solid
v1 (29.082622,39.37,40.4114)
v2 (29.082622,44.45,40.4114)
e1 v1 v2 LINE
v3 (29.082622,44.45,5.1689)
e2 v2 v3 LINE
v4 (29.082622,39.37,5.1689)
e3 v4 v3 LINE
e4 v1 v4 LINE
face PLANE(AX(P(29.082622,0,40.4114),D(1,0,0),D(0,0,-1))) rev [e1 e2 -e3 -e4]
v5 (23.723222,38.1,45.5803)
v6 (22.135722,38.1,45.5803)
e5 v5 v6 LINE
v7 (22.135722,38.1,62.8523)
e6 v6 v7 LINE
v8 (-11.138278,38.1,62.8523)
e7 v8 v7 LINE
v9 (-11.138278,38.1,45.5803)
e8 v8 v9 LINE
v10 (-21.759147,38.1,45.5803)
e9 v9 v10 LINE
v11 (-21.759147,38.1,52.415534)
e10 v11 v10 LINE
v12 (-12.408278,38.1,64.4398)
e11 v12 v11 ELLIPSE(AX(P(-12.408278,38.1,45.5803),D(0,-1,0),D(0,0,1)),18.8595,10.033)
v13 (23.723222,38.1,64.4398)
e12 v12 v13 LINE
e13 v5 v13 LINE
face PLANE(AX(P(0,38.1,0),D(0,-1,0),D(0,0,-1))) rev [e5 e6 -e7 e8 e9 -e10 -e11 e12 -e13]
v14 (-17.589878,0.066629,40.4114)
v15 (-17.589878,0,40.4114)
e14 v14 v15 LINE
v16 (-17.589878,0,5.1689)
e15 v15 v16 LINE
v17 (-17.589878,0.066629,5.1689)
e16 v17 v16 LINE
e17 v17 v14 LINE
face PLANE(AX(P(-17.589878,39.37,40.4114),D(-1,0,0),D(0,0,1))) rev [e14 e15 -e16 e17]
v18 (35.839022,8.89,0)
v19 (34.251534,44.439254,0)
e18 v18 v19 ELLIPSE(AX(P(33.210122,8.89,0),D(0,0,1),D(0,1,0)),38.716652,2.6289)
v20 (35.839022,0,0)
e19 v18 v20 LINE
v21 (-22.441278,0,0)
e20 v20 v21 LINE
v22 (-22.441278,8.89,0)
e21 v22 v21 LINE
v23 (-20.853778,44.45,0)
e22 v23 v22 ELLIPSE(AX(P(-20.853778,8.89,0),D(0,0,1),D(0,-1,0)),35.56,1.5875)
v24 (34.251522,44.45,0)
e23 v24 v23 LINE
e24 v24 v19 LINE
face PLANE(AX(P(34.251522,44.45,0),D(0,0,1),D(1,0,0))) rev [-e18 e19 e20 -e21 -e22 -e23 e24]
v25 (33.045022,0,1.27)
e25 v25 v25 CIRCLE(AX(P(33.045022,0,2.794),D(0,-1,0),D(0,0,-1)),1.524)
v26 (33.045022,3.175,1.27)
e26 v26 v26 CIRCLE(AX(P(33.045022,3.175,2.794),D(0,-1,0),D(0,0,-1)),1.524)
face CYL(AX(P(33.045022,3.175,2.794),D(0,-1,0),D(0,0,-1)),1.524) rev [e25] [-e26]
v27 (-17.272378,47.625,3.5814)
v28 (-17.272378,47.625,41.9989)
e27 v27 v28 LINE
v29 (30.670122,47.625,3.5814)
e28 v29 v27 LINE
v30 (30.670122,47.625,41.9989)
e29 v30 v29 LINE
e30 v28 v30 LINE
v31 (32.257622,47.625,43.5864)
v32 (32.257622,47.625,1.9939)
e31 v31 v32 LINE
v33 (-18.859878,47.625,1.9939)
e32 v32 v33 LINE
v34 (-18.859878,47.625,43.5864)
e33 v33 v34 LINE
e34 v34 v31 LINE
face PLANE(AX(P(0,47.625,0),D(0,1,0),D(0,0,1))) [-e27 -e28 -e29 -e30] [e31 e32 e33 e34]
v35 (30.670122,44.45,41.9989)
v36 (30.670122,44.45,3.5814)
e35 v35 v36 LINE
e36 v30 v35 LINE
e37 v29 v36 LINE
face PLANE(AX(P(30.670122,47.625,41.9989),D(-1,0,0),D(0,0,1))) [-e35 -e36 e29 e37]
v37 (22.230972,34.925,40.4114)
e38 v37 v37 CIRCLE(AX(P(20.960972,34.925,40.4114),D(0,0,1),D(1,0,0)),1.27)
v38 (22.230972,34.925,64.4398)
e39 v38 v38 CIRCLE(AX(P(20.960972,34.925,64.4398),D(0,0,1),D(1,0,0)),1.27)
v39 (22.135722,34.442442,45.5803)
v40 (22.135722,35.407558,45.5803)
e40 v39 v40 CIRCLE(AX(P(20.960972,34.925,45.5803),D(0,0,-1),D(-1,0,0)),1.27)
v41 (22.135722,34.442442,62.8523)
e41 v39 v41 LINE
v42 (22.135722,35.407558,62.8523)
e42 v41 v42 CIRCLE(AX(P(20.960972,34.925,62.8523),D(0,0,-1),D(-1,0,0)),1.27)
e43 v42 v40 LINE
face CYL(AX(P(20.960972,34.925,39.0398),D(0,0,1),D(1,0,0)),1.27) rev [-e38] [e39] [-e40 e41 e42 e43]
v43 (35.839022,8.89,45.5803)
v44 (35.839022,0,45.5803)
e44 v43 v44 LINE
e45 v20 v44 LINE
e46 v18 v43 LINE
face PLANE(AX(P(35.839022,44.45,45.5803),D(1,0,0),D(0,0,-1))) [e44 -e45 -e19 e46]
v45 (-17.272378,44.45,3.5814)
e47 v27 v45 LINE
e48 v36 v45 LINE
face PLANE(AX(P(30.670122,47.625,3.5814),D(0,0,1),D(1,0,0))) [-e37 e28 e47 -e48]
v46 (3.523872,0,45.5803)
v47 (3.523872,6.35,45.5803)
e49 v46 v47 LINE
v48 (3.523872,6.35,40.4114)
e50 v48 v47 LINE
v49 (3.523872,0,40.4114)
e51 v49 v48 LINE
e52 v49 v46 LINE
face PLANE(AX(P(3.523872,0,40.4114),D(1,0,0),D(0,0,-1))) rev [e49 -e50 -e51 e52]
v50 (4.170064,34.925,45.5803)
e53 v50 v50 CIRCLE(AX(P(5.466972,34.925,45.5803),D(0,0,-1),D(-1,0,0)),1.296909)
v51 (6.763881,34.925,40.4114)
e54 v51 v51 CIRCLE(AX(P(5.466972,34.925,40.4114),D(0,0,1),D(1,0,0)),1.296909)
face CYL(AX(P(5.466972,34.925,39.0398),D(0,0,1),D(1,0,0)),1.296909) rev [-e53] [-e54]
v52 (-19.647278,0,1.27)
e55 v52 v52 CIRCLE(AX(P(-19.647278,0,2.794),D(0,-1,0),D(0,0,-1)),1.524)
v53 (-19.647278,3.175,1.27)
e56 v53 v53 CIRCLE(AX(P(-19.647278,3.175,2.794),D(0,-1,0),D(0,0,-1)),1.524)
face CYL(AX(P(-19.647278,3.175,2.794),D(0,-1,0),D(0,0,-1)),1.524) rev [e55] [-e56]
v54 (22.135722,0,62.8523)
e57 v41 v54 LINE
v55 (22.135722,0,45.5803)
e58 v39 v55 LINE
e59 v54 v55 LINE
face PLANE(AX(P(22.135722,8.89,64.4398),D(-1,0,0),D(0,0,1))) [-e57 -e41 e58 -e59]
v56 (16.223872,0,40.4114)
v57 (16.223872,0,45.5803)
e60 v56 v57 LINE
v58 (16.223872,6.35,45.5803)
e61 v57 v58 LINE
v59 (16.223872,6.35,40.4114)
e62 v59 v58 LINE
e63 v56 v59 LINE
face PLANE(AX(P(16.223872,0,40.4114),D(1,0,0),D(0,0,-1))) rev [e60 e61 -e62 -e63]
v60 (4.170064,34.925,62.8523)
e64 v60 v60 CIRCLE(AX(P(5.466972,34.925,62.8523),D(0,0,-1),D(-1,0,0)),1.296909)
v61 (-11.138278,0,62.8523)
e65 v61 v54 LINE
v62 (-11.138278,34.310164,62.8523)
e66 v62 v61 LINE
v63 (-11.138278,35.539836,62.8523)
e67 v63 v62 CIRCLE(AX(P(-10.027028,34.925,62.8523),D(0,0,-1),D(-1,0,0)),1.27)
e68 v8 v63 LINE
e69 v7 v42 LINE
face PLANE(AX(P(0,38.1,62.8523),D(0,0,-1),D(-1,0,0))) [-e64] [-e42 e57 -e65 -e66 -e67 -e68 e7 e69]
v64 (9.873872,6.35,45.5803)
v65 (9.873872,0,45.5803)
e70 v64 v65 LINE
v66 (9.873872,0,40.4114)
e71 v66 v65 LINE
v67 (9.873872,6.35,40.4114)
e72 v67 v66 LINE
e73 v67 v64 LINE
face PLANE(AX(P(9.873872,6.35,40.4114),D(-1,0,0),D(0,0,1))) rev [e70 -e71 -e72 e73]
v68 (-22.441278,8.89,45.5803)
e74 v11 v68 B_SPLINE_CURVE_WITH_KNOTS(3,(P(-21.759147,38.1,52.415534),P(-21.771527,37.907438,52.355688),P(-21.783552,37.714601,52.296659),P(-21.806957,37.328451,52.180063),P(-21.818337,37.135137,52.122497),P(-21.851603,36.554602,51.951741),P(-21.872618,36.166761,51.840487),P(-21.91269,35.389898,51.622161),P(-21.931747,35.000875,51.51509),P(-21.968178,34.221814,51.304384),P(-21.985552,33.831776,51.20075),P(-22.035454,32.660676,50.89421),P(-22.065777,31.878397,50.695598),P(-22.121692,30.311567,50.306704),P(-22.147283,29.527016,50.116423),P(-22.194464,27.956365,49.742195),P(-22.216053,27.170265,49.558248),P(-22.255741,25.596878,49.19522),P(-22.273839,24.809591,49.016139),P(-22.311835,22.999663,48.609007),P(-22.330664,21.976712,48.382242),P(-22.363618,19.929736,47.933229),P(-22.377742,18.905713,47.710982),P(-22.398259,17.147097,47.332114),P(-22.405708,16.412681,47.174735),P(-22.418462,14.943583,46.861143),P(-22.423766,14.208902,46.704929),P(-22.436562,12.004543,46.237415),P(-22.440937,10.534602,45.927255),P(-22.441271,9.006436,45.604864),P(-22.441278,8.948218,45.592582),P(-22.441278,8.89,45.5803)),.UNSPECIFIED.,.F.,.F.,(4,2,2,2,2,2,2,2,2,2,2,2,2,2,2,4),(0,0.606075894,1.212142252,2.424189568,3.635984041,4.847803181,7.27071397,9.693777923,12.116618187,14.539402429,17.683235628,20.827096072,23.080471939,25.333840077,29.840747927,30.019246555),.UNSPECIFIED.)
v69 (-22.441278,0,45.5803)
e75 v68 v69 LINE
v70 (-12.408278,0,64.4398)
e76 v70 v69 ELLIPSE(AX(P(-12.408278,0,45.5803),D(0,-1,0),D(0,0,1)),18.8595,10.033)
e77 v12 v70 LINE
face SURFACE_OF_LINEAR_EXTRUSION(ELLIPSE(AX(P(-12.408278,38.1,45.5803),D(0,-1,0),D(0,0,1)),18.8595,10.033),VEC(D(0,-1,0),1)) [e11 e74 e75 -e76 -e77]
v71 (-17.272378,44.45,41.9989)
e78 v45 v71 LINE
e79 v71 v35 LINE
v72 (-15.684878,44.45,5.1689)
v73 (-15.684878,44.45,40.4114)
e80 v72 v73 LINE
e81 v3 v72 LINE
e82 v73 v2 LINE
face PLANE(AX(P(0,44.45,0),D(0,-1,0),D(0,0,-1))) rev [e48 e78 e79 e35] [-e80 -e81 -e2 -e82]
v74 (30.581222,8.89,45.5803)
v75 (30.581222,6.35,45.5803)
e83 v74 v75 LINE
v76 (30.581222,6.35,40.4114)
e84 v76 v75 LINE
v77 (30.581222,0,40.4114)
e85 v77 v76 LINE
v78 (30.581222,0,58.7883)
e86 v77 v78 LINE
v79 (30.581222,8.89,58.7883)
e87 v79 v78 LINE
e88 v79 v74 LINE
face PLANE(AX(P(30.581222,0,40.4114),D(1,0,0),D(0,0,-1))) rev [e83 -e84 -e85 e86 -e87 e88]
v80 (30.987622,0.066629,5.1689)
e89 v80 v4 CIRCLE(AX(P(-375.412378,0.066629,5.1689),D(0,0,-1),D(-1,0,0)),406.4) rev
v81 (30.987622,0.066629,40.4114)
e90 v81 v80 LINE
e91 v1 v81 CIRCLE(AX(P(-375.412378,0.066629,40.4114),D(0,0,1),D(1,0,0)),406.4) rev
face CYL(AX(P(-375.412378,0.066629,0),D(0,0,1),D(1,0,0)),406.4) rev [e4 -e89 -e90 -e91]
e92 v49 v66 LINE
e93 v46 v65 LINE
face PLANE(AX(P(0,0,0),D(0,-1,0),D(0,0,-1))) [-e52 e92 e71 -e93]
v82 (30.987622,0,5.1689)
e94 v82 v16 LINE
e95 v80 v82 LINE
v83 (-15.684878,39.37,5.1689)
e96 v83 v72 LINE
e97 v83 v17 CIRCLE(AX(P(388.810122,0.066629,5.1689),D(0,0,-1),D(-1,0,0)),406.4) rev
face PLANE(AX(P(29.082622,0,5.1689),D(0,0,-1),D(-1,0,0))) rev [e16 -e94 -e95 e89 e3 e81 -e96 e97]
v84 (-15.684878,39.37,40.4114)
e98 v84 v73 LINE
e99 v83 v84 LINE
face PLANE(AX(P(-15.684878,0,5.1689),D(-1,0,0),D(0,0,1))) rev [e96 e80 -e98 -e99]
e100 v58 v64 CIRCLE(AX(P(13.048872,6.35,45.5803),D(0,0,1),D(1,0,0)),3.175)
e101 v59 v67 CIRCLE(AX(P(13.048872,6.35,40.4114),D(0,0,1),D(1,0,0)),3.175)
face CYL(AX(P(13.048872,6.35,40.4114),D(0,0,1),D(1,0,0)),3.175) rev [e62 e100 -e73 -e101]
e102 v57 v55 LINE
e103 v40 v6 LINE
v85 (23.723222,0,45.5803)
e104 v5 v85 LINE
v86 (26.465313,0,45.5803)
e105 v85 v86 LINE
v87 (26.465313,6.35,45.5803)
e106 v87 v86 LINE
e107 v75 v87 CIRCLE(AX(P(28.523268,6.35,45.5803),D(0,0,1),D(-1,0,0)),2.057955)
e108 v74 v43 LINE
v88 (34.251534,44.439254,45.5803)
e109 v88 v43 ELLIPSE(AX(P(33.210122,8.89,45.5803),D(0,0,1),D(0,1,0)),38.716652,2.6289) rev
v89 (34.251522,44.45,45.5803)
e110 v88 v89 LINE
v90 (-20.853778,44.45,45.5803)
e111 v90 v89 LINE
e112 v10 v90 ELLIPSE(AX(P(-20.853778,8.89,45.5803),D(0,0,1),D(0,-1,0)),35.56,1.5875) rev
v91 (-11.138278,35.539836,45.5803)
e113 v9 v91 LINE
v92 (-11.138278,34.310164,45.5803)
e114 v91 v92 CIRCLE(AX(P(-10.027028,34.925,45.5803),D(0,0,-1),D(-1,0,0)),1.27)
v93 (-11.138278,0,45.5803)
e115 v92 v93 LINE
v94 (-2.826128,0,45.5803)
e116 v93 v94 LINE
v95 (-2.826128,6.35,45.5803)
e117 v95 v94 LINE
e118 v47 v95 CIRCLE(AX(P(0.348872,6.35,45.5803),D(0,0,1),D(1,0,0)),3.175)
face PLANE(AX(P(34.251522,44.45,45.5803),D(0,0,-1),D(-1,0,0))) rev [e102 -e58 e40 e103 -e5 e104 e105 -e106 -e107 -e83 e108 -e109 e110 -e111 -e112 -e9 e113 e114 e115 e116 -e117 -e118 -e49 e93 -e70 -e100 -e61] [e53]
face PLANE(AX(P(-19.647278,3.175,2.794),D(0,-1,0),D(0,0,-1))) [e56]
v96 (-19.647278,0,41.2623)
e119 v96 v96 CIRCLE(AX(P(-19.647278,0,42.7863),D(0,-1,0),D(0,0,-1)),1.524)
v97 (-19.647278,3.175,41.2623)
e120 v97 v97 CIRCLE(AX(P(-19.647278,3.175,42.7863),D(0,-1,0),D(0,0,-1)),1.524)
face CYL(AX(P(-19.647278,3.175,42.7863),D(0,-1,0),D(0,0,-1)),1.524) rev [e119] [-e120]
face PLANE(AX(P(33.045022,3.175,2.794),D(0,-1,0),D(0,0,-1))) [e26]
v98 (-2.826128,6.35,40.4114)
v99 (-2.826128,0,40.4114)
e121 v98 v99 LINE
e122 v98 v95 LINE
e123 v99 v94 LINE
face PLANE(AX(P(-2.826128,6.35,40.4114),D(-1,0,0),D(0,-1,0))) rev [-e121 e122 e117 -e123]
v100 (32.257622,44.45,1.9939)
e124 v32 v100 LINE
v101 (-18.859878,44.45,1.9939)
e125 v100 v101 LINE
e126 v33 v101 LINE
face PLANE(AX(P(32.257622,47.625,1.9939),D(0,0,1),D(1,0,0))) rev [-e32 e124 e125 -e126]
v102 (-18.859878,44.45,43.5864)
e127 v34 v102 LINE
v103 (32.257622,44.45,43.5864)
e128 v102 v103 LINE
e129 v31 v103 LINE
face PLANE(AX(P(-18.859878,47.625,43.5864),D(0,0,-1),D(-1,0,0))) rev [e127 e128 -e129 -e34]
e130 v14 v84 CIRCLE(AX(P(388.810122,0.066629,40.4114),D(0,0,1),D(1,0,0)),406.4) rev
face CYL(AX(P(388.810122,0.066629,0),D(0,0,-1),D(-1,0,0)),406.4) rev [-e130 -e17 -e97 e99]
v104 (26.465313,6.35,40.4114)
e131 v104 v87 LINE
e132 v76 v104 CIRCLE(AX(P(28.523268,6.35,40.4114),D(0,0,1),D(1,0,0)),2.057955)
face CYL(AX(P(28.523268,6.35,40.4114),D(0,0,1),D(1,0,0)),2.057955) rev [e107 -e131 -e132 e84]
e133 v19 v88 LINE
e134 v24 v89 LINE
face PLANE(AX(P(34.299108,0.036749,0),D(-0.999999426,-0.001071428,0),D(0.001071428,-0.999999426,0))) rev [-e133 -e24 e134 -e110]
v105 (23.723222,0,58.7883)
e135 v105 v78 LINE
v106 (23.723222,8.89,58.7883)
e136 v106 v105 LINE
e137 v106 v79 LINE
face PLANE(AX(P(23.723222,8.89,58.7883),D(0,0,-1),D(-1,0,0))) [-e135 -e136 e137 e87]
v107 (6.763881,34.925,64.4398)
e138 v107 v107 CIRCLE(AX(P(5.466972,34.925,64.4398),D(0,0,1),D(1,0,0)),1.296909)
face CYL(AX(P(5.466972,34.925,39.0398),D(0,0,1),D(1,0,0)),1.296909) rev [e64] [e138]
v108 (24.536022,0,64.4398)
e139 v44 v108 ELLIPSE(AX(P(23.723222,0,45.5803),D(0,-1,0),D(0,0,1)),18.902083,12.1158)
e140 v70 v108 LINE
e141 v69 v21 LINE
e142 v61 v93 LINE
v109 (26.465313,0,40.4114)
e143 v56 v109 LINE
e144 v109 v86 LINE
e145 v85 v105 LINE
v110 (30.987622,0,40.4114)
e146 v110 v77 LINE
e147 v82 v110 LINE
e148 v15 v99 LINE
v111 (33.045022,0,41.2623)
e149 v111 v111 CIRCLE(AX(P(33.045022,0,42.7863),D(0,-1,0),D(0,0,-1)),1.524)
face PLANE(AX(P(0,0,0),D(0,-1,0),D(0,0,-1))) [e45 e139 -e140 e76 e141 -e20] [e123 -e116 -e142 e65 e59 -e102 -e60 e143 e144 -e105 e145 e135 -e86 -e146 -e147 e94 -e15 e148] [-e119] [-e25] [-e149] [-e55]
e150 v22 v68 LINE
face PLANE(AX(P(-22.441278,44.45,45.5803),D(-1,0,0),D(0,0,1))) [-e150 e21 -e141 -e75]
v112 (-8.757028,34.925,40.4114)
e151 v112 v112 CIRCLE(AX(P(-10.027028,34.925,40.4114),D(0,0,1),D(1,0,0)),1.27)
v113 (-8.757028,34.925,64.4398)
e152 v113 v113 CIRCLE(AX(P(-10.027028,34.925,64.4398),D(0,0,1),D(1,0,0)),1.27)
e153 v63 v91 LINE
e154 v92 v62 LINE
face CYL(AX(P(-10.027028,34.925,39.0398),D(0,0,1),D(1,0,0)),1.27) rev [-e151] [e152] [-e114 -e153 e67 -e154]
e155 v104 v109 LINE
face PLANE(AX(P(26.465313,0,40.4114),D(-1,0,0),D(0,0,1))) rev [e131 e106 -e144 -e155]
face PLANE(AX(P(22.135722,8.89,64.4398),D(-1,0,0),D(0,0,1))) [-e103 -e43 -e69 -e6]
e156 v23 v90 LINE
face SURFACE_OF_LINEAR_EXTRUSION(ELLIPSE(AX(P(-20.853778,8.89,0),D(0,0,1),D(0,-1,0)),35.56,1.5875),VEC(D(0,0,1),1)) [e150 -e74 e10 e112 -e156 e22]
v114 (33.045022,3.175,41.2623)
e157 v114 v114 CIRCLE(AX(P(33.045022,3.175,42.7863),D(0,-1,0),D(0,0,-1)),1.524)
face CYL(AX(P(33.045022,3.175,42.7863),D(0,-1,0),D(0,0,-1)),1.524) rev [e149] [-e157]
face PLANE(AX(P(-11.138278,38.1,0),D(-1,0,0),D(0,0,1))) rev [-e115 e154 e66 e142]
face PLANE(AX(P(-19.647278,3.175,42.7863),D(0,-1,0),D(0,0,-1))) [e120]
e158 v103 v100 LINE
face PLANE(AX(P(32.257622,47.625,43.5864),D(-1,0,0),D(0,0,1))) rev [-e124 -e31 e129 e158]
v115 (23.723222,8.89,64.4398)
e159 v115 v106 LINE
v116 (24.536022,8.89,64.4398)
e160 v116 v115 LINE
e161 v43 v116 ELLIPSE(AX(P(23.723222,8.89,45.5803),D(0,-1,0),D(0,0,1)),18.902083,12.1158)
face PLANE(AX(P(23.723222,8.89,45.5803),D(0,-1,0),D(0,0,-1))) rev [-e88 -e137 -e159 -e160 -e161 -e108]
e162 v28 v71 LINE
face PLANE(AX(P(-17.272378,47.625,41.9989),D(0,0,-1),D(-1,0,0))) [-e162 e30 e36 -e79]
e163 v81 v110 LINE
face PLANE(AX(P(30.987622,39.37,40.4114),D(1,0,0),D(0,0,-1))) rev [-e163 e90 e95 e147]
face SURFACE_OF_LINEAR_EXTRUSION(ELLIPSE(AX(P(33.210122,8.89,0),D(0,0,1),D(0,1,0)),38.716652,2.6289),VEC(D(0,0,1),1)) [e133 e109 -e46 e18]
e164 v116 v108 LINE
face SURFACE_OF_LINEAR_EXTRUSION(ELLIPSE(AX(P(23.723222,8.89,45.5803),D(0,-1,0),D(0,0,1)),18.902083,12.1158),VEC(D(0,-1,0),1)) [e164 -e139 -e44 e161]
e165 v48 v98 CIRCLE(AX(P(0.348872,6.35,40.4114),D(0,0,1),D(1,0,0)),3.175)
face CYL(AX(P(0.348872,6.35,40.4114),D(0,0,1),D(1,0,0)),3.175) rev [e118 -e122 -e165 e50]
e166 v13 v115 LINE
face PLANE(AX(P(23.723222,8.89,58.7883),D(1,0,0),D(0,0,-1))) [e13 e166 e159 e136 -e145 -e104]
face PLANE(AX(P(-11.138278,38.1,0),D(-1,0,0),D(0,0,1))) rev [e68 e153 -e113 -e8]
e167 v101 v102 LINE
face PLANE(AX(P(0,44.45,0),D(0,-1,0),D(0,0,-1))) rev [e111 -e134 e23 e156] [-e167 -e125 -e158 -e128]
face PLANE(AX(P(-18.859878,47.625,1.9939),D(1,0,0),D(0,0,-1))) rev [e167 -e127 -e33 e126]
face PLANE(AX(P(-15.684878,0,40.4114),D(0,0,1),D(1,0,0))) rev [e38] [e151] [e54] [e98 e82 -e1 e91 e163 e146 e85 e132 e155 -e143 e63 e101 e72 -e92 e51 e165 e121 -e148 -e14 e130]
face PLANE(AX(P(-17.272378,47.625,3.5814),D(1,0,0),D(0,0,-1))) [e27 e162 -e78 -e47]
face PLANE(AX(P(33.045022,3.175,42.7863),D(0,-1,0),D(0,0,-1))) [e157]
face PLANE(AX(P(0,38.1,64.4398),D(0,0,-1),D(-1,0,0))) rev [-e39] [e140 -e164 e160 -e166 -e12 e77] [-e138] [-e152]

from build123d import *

# Parameters (mm, degrees)
SKETCH3_W            = 55.1053
SKETCH3_H            = 45.5803
BOSS_EXTRUDE2_DEPTH  = 44.45
SKETCH11_W           = 51.1175
SKETCH11_H           = 41.5925
SKETCH11_W_2         = 47.9425
SKETCH11_H_2         = 38.4175
BOSS_EXTRUDE3_DEPTH  = 3.175
SKETCH13_W           = 44.7675
SKETCH13_H           = 35.2425
CUT_EXTRUDE3_DEPTH   = 73.294764944
CUT_EXTRUDE4_DEPTH   = 5.1689
SKETCH19_W           = 1.5875
SKETCH19_H           = 45.5803
BOSS_EXTRUDE4_DEPTH  = 44.45
SKETCH21_W           = 1.905
SKETCH21_H           = 35.2425
CUT_EXTRUDE5_DEPTH   = 39.37
FILLET1_R            = 406.4
FILLET2_R            = 406.4
SKETCH22_R           = 1.524
CUT_EXTRUDE7_DEPTH   = 3.175
BOSS_EXTRUDE5_DEPTH  = 38.1
SKETCH39_R           = 1.296908885
SKETCH39_R_2         = 1.27
CUT_EXTRUDE14_DEPTH  = 25.4
BOSS_EXTRUDE22_DEPTH = 8.89
CUT_EXTRUDE15_DEPTH  = 88.778493945
SKETCH48_W           = 18.8595
SKETCH48_H           = 29.21
BOSS_EXTRUDE23_DEPTH = 1.5875
SKETCH52_R           = 1.27
CUT_EXTRUDE16_DEPTH  = 25.4


with BuildPart() as part:
    # Sketch3 → Boss-Extrude2 (new body)
    with BuildSketch(Plane(origin=(0, 0, 0), x_dir=(1, 0, 0), z_dir=(0, 1, 0))):
        with Locations((6.69887245, -22.79015)):
            Rectangle(SKETCH3_W, SKETCH3_H)
    extrude(amount=BOSS_EXTRUDE2_DEPTH)

    # Sketch11 → Boss-Extrude3 (add)
    with BuildSketch(Plane(origin=(0, 44.45, 0), x_dir=(1, 0, 0), z_dir=(0, 1, 0))):
        with Locations((6.69887245, -22.79015)):
            Rectangle(SKETCH11_W, SKETCH11_H)
        with Locations((6.69887245, -22.79015)):
            Rectangle(SKETCH11_W_2, SKETCH11_H_2, mode=Mode.SUBTRACT)
    extrude(amount=BOSS_EXTRUDE3_DEPTH)

    # Sketch13 → Cut-Extrude3 (cut, through all)
    with BuildSketch(Plane(origin=(0, 44.45, 0), x_dir=(1, 0, 0), z_dir=(0, 1, 0))):
        with Locations((6.69887245, -22.79015)):
            Rectangle(SKETCH13_W, SKETCH13_H)
    extrude(amount=-CUT_EXTRUDE3_DEPTH, mode=Mode.SUBTRACT)

    # Sketch14 → Cut-Extrude4 (cut)
    with BuildSketch(Plane.XY.offset(45.5803)):
        with BuildLine():
            Line((-2.82612755, 6.35), (-2.82612755, 0))
            Line((-2.82612755, 0), (3.52387245, 0))
            Line((3.52387245, 0), (3.52387245, 6.35))
            ThreePointArc((3.52387245, 6.35), (0.34887245, 9.525), (-2.82612755, 6.35))
        make_face()
        with BuildLine():
            Line((9.87387245, 6.35), (9.87387245, 0))
            Line((9.87387245, 0), (16.22387245, 0))
            Line((16.22387245, 0), (16.22387245, 6.35))
            ThreePointArc((16.22387245, 6.35), (13.04887245, 9.525), (9.87387245, 6.35))
        make_face()
        with BuildLine():
            Line((26.465313364, 0), (30.581222486, 0))
            Line((30.581222486, 0), (30.581222486, 6.35))
            ThreePointArc((30.581222486, 6.35), (28.523267925, 8.407954561), (26.465313364, 6.35))
            Line((26.465313364, 6.35), (26.465313364, 0))
        make_face()
    extrude(amount=-CUT_EXTRUDE4_DEPTH, mode=Mode.SUBTRACT)

    # Sketch19 → Boss-Extrude4 (add)
    with BuildSketch(Plane.XZ):
        with Locations((-21.64752755, 22.79015)):
            Rectangle(SKETCH19_W, SKETCH19_H)
        with Locations((35.04527245, 22.79015)):
            Rectangle(SKETCH19_W, SKETCH19_H)
    extrude(amount=-BOSS_EXTRUDE4_DEPTH)

    # Sketch21 → Cut-Extrude5 (cut)
    with BuildSketch(Plane(origin=(0, 0, 0), x_dir=(-1, 0, 0), z_dir=(0, -1, 0))):
        with Locations((16.63737755, -22.79015)):
            Rectangle(SKETCH21_W, SKETCH21_H)
        with Locations((-30.03512245, -22.79015)):
            Rectangle(SKETCH21_W, SKETCH21_H)
    extrude(amount=-CUT_EXTRUDE5_DEPTH, mode=Mode.SUBTRACT)

    # Fillet1
    # the kernel refuses this fillet: 406.4 mm, written as the material it adds along each edge
    with BuildSketch(Plane(origin=(-17.58987755, 39.37, 40.4114), x_dir=(0, -1, 0), z_dir=(0, 0, -1))) as fillet1_piece_1:
        with BuildLine():
            CenterArc((39.303371039, -406.4), FILLET1_R, 90, 5.549809332)
            Line((0, -1.905), (0, 0))
            Line((0, 0), (39.303371039, 0))
        make_face()
    extrude(amount=35.2425)

    # Fillet2
    # the kernel refuses this fillet: 406.4 mm, written as the material it adds along each edge
    with BuildSketch(Plane(origin=(30.98762245, 39.37, -93.089527597), x_dir=(-1, 0, 0), z_dir=(0, 0, 1))) as fillet2_piece_1_section:
        with BuildLine():
            CenterArc((406.4, 39.303371039), FILLET2_R, 180, 5.549809332)
            Line((0, 39.303371039), (0, 0))
            Line((0, 0), (1.905, 0))
        make_face()
    fillet2_piece_1 = extrude(amount=231.759355193, mode=Mode.PRIVATE)
    fillet2_piece_1 = split(fillet2_piece_1, bisect_by=Plane(origin=(30.98762245, 39.37, 45.5803), z_dir=(0, 0, -1)), keep=Keep.TOP, mode=Mode.PRIVATE)
    fillet2_piece_1 = split(fillet2_piece_1, bisect_by=Plane(origin=(30.98762245, 39.37, 0), z_dir=(0, 0, 1)), keep=Keep.TOP, mode=Mode.PRIVATE)
    add(fillet2_piece_1)

    # Sketch22 → Cut-Extrude7 (cut)
    with BuildSketch(Plane.XZ):
        with Locations(Location((-19.64727755, 42.7863, 0), (0, 0, 270))):
            Circle(SKETCH22_R)
        with Locations(Location((33.04502245, 42.7863, 0), (0, 0, 270))):
            Circle(SKETCH22_R)
        with Locations(Location((-19.64727755, 2.794, 0), (0, 0, 270))):
            Circle(SKETCH22_R)
        with Locations(Location((33.04502245, 2.794, 0), (0, 0, 270))):
            Circle(SKETCH22_R)
    extrude(amount=-CUT_EXTRUDE7_DEPTH, mode=Mode.SUBTRACT)

    # Sketch23 → Boss-Extrude5 (add)
    with BuildSketch(Plane.XZ):
        with BuildLine():
            Line((22.13572245, 62.8523), (22.13572245, 64.4398))
            Line((22.13572245, 64.4398), (21.379894456, 64.4398))
            Line((21.379894456, 64.4398), (-12.40827755, 64.4398))
            add(Edge.make_bspline(
                [(-12.40827755, 64.4398), (-22.44127755, 64.4398), (-22.44127755, 45.5803)],
                knots=[0, 0, 0, 1.570796327, 1.570796327, 1.570796327], degree=2, weights=[1, 0.707106781, 1]))
            Line((-22.44127755, 45.5803), (-11.13827755, 45.5803))
            Line((-11.13827755, 45.5803), (-11.13827755, 58.170091836))
            Line((-11.13827755, 58.170091836), (-11.13827755, 62.8523))
            Line((-11.13827755, 62.8523), (22.13572245, 62.8523))
        make_face()
    extrude(amount=-BOSS_EXTRUDE5_DEPTH)

    # Sketch39 → Cut-Extrude14 (cut)
    with BuildSketch(Plane.XY.offset(64.4398)):
        with Locations((5.46697245, 34.925)):
            Circle(SKETCH39_R)
        with Locations((-10.02702755, 34.925)):
            Circle(SKETCH39_R_2)
        with Locations((20.96097245, 34.925)):
            Circle(SKETCH39_R_2)
    extrude(amount=-CUT_EXTRUDE14_DEPTH, mode=Mode.SUBTRACT)

    # Sketch43 → Boss-Extrude22 (add)
    with BuildSketch(Plane.XZ):
        with BuildLine():
            Line((30.58122245, 45.5803), (35.83902245, 45.5803))
            add(Edge.make_bspline(
                [(35.83902245, 45.5803), (35.83902245, 63.254133988), (24.53602245, 64.4398)],
                knots=[4.71238898, 4.71238898, 4.71238898, 6.216048931, 6.216048931, 6.216048931], degree=2, weights=[1, 0.730440262, 1]))
            Line((24.53602245, 64.4398), (22.13572245, 64.4398))
            Line((22.13572245, 64.4398), (22.13572245, 45.5803))
            Line((22.13572245, 45.5803), (23.72322245, 45.5803))
            Line((23.72322245, 45.5803), (23.72322245, 58.7883))
            Line((23.72322245, 58.7883), (30.58122245, 58.7883))
            Line((30.58122245, 58.7883), (30.58122245, 45.5803))
        make_face()
    extrude(amount=-BOSS_EXTRUDE22_DEPTH)

    # Sketch51 → Cut-Extrude15 (cut, through all)
    with BuildSketch(Plane.XY.offset(64.4398)):
        with BuildLine():
            add(Edge.make_bspline(
                [(-20.85377755, 44.45), (-22.44127755, 44.45), (-22.44127755, 8.89)],
                knots=[3.141592654, 3.141592654, 3.141592654, 4.71238898, 4.71238898, 4.71238898], degree=2, weights=[1, 0.707106781, 1]))
            Line((-22.44127755, 8.89), (-23.728758276, 8.89))
            Line((-23.728758276, 8.89), (-23.728758276, 45.620970636))
            Line((-23.728758276, 45.620970636), (-20.85377755, 45.620970636))
            Line((-20.85377755, 45.620970636), (-20.85377755, 44.45))
        make_face()
        with BuildLine():
            add(Edge.make_bspline(
                [(35.83902245, 8.89), (35.83902245, 34.352534387), (34.251533964, 44.439253731)],
                knots=[4.71238898, 4.71238898, 4.71238898, 5.875876601, 5.875876601, 5.875876601], degree=2, weights=[1, 0.835505729, 1]))
            Line((34.251533964, 44.439253731), (34.25152245, 44.45))
            Line((34.25152245, 44.45), (34.25152245, 45.620970636))
            Line((34.25152245, 45.620970636), (37.555875031, 45.620970636))
            Line((37.555875031, 45.620970636), (37.555875031, 8.89))
            Line((37.555875031, 8.89), (35.83902245, 8.89))
        make_face()
    extrude(amount=-CUT_EXTRUDE15_DEPTH, mode=Mode.SUBTRACT)

    # Sketch48 → Boss-Extrude23 (add)
    with BuildSketch(Plane(origin=(22.13572245, 0, 0), x_dir=(0, 0, -1), z_dir=(1, 0, 0))):
        with Locations((-55.01005, 23.495)):
            Rectangle(SKETCH48_W, SKETCH48_H)
    extrude(amount=BOSS_EXTRUDE23_DEPTH)

    # Sketch52 → Cut-Extrude16 (cut)
    with BuildSketch(Plane.XY.offset(64.4398)):
        with Locations((20.96097245, 34.925)):
            Circle(SKETCH52_R)
    extrude(amount=-CUT_EXTRUDE16_DEPTH, mode=Mode.SUBTRACT)


solid = part.part
